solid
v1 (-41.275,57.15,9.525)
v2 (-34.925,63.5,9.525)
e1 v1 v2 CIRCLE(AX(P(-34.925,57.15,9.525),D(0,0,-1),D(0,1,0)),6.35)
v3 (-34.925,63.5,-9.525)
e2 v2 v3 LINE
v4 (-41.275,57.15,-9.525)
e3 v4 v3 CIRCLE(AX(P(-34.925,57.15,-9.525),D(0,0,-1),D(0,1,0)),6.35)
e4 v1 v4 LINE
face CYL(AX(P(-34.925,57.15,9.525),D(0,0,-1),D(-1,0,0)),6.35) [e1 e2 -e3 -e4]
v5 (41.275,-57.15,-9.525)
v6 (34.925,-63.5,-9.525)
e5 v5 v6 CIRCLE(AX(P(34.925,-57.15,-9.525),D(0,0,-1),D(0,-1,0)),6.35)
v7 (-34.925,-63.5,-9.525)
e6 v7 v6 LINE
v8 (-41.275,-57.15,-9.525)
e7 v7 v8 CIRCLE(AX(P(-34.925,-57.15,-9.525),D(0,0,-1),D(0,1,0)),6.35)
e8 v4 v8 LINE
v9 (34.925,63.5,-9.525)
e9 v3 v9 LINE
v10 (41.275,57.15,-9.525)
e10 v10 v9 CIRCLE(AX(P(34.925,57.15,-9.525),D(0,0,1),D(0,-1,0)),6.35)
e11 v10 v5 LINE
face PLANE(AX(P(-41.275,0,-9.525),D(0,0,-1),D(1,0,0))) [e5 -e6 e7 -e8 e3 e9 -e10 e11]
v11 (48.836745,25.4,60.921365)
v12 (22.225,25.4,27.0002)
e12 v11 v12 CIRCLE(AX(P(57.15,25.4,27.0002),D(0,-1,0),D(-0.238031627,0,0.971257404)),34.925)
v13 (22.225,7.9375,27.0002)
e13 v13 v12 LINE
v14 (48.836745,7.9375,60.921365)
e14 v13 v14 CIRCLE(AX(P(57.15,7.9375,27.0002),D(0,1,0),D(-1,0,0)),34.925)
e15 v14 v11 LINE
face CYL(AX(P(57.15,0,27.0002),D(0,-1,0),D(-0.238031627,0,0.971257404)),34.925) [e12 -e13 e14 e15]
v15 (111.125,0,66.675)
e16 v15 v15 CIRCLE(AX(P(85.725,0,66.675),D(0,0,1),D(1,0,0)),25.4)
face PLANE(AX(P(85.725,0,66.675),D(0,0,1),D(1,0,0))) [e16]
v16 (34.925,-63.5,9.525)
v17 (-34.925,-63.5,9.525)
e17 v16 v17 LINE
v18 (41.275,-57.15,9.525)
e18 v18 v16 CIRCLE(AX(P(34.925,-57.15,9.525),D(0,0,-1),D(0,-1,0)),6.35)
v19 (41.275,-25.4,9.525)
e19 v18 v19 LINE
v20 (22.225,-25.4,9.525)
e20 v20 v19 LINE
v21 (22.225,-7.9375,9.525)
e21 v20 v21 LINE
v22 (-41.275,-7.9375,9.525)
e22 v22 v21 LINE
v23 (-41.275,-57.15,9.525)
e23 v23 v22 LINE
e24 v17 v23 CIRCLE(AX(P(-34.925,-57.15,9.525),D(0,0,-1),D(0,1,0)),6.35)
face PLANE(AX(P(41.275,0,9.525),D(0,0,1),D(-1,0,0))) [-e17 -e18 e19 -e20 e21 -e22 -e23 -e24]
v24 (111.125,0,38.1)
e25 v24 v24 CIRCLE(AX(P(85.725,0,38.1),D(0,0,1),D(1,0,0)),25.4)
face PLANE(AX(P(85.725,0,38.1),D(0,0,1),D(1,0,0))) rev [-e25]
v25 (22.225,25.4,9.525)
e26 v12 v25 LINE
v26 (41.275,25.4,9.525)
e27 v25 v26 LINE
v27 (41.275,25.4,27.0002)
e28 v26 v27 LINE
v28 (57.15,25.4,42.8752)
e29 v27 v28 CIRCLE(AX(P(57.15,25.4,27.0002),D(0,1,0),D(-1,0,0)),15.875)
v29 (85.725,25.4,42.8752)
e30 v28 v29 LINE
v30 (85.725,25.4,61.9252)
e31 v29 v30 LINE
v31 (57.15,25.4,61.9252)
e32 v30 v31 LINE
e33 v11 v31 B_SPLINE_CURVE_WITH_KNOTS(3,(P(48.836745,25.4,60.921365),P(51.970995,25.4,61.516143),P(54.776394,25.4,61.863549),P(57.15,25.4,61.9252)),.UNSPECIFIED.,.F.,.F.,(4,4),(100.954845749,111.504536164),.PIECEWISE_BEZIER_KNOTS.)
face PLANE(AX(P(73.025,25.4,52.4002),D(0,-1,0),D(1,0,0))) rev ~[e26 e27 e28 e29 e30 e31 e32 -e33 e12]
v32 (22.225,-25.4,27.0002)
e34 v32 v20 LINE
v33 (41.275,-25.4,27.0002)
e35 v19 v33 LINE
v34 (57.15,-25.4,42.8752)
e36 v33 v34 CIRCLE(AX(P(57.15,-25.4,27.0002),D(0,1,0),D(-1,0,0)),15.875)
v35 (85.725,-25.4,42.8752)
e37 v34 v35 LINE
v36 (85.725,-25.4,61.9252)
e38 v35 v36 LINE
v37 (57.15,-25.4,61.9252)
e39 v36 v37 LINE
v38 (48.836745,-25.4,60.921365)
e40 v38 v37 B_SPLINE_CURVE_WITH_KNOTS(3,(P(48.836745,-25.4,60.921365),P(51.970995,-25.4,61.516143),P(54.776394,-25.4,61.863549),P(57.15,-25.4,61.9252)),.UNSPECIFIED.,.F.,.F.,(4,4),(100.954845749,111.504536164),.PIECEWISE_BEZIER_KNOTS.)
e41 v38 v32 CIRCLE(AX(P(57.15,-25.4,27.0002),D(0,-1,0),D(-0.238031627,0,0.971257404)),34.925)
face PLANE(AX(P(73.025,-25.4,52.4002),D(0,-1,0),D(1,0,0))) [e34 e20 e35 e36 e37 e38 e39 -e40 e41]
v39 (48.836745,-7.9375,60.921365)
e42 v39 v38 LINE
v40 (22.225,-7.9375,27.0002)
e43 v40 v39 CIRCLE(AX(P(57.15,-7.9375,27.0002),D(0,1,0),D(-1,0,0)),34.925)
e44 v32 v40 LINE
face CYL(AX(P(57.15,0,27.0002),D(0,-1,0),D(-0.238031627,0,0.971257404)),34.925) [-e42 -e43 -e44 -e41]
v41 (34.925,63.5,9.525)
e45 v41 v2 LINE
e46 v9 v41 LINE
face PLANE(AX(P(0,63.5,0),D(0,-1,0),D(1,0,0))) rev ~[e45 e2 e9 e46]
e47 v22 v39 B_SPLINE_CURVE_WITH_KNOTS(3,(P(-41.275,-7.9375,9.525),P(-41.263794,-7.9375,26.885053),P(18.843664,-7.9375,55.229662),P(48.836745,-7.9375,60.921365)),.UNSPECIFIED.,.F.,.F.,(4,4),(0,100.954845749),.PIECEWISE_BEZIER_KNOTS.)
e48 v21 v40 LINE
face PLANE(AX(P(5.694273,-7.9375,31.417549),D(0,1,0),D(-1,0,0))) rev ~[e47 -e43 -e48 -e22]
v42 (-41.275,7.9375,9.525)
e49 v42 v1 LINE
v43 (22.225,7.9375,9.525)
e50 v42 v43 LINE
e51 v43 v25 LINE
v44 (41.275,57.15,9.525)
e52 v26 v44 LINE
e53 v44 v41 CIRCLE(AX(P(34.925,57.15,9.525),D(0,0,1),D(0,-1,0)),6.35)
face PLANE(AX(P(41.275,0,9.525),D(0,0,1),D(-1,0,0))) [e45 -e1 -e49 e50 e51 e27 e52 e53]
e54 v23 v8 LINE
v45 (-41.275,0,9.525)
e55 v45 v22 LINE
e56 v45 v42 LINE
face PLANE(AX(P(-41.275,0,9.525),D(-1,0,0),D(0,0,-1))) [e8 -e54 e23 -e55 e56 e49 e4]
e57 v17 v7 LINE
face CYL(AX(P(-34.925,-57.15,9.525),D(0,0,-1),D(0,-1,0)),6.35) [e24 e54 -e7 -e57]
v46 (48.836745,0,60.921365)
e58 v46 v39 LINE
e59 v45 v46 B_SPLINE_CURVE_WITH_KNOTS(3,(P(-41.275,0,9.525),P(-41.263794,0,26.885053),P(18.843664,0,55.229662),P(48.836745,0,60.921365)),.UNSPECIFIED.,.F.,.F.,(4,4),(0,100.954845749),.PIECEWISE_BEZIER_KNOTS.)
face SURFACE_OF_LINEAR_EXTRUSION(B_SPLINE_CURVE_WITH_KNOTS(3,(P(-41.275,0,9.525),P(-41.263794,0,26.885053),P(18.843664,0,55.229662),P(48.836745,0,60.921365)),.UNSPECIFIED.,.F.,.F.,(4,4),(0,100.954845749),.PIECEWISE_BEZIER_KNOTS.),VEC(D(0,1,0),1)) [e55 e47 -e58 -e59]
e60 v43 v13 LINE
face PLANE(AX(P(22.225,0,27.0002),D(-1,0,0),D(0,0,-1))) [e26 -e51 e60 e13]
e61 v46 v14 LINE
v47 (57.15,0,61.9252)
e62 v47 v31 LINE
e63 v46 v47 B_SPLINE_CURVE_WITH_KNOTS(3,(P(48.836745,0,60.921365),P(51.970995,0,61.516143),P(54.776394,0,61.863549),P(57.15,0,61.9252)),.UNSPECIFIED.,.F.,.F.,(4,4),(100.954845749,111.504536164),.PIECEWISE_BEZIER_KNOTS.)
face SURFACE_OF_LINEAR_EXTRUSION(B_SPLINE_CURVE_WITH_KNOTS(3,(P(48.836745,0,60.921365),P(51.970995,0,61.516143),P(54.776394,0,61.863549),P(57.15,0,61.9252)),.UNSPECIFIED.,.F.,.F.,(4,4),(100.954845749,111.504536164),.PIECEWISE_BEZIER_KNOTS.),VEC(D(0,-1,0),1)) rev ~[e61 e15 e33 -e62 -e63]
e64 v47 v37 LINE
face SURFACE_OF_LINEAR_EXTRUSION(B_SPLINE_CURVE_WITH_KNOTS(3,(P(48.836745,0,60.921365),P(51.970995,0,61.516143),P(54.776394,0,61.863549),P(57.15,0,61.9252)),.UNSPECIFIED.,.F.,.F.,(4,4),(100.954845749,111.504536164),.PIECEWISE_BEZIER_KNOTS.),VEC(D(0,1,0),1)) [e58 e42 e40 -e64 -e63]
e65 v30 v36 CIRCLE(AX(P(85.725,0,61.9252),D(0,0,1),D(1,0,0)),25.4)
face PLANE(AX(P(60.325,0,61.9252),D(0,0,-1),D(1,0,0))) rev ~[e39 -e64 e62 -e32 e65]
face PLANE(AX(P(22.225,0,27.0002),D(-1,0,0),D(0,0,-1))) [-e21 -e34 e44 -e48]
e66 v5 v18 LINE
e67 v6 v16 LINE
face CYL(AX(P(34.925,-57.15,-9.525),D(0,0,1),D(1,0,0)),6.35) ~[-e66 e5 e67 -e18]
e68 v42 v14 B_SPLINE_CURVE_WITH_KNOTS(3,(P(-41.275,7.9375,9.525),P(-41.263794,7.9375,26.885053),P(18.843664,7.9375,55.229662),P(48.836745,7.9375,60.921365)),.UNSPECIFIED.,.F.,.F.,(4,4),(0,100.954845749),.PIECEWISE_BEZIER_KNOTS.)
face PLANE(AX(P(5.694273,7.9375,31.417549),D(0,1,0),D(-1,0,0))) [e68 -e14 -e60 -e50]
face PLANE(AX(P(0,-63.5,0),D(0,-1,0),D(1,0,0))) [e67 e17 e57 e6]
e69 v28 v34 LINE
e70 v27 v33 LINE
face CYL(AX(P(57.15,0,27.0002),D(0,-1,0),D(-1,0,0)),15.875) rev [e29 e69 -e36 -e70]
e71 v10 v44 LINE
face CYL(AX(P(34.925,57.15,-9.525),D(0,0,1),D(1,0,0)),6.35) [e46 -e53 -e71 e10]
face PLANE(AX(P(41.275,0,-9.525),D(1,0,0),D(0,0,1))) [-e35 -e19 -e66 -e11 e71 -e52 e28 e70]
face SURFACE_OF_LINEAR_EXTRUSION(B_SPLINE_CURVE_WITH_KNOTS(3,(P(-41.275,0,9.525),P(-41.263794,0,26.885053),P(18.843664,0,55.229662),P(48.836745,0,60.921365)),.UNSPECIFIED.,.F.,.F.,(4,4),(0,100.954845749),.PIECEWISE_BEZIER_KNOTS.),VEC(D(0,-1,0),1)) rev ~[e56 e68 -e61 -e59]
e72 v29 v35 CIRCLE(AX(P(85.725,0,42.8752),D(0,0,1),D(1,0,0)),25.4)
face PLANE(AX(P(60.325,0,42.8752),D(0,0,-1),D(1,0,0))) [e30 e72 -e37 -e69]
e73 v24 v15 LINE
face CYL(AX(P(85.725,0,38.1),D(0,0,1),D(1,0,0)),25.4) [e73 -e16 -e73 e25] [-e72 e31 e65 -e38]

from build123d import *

# Parameters (mm, degrees)
F1_DEPTH = 63.5
F2_DEPTH = 25.4
F3_DEPTH = 7.9375
F0_W     = 25.4
F0_H     = 19.05
F4_DEPTH = 25.4
F6_R     = 6.35


# Not quite as in the source:
# - a feature names something its author has since deleted; it is built from what else it names


with BuildPart() as f1:
    # F0 (on Front) → F1 (new body, symmetric)
    with BuildSketch(Plane.XZ):
        Polygon((-41.275, 9.525), (-41.275, -9.525), (41.275, -9.525), (41.275, 9.525), (22.225, 9.525), align=None)
    extrude(amount=F1_DEPTH, both=True)

    # F0 (on Front) → F2 (join, symmetric)
    with BuildSketch(Plane.XZ):
        with BuildLine():
            Line((22.225, 9.525), (41.275, 9.525))
            Line((41.275, 9.525), (41.275, 27.0002))
            ThreePointArc((41.275, 27.0002), (45.9246798487, 38.2255201513), (57.15, 42.8752))
            Line((57.15, 42.8752), (60.325, 42.8752))
            Line((60.325, 42.8752), (60.325, 61.9252))
            Line((60.325, 61.9252), (57.15, 61.9252))
            add(Edge.make_bspline(
                [(48.8367454286, 60.9213648301), (51.9709953624, 61.5161426584), (54.7763944368, 61.8635493609), (57.15, 61.9252)],
                knots=[100.9548457495, 100.9548457495, 100.9548457495, 100.9548457495, 111.5045361635, 111.5045361635, 111.5045361635, 111.5045361635], degree=3))
            ThreePointArc((48.8367454286, 60.9213648301), (29.6718628642, 48.5572778295), (22.225, 27.0002))
            Line((22.225, 27.0002), (22.225, 9.525))
        make_face()
    extrude(amount=F2_DEPTH, both=True)

    # F0 (on Front) → F3 (join, symmetric)
    with BuildSketch(Plane.XZ):
        with BuildLine():
            add(Edge.make_bspline(
                [(-41.275, 9.525), (-41.2637939453, 26.8850534088), (18.8436644761, 55.2296618934), (48.8367454286, 60.9213648301)],
                knots=[0, 0, 0, 0, 100.9548457495, 100.9548457495, 100.9548457495, 100.9548457495], degree=3))
            Line((-41.275, 9.525), (22.225, 9.525))
            Line((22.225, 9.525), (22.225, 27.0002))
            ThreePointArc((22.225, 27.0002), (29.6718628642, 48.5572778295), (48.8367454286, 60.9213648301))
        make_face()
    extrude(amount=F3_DEPTH, both=True)

    # F0 (on Front) → F4 (join, symmetric)
    with BuildSketch(Plane.XZ):
        with Locations((73.025, 52.4002)):
            Rectangle(F0_W, F0_H)
    extrude(amount=F4_DEPTH, both=True)

    # F0 (on Front) → F5 (revolve)
    with BuildSketch(Plane.XZ):
        Polygon((85.725, 66.675), (85.725, 61.9252), (85.725, 42.8752), (85.725, 38.1), (111.125, 38.1), (111.125, 66.675), align=None)
    revolve(axis=Axis((85.725, 0, 52.3875), (0, 0, 1)))

    # F6
    f6_edges = [f1.edges().sort_by_distance(p)[0] for p in [
        (41.275, 63.5, 0),
        (41.275, -63.5, 0),
        (-41.275, -63.5, 0),
        (-41.275, 63.5, 0),
    ]]
    fillet(f6_edges, radius=F6_R)


solid = f1.part
